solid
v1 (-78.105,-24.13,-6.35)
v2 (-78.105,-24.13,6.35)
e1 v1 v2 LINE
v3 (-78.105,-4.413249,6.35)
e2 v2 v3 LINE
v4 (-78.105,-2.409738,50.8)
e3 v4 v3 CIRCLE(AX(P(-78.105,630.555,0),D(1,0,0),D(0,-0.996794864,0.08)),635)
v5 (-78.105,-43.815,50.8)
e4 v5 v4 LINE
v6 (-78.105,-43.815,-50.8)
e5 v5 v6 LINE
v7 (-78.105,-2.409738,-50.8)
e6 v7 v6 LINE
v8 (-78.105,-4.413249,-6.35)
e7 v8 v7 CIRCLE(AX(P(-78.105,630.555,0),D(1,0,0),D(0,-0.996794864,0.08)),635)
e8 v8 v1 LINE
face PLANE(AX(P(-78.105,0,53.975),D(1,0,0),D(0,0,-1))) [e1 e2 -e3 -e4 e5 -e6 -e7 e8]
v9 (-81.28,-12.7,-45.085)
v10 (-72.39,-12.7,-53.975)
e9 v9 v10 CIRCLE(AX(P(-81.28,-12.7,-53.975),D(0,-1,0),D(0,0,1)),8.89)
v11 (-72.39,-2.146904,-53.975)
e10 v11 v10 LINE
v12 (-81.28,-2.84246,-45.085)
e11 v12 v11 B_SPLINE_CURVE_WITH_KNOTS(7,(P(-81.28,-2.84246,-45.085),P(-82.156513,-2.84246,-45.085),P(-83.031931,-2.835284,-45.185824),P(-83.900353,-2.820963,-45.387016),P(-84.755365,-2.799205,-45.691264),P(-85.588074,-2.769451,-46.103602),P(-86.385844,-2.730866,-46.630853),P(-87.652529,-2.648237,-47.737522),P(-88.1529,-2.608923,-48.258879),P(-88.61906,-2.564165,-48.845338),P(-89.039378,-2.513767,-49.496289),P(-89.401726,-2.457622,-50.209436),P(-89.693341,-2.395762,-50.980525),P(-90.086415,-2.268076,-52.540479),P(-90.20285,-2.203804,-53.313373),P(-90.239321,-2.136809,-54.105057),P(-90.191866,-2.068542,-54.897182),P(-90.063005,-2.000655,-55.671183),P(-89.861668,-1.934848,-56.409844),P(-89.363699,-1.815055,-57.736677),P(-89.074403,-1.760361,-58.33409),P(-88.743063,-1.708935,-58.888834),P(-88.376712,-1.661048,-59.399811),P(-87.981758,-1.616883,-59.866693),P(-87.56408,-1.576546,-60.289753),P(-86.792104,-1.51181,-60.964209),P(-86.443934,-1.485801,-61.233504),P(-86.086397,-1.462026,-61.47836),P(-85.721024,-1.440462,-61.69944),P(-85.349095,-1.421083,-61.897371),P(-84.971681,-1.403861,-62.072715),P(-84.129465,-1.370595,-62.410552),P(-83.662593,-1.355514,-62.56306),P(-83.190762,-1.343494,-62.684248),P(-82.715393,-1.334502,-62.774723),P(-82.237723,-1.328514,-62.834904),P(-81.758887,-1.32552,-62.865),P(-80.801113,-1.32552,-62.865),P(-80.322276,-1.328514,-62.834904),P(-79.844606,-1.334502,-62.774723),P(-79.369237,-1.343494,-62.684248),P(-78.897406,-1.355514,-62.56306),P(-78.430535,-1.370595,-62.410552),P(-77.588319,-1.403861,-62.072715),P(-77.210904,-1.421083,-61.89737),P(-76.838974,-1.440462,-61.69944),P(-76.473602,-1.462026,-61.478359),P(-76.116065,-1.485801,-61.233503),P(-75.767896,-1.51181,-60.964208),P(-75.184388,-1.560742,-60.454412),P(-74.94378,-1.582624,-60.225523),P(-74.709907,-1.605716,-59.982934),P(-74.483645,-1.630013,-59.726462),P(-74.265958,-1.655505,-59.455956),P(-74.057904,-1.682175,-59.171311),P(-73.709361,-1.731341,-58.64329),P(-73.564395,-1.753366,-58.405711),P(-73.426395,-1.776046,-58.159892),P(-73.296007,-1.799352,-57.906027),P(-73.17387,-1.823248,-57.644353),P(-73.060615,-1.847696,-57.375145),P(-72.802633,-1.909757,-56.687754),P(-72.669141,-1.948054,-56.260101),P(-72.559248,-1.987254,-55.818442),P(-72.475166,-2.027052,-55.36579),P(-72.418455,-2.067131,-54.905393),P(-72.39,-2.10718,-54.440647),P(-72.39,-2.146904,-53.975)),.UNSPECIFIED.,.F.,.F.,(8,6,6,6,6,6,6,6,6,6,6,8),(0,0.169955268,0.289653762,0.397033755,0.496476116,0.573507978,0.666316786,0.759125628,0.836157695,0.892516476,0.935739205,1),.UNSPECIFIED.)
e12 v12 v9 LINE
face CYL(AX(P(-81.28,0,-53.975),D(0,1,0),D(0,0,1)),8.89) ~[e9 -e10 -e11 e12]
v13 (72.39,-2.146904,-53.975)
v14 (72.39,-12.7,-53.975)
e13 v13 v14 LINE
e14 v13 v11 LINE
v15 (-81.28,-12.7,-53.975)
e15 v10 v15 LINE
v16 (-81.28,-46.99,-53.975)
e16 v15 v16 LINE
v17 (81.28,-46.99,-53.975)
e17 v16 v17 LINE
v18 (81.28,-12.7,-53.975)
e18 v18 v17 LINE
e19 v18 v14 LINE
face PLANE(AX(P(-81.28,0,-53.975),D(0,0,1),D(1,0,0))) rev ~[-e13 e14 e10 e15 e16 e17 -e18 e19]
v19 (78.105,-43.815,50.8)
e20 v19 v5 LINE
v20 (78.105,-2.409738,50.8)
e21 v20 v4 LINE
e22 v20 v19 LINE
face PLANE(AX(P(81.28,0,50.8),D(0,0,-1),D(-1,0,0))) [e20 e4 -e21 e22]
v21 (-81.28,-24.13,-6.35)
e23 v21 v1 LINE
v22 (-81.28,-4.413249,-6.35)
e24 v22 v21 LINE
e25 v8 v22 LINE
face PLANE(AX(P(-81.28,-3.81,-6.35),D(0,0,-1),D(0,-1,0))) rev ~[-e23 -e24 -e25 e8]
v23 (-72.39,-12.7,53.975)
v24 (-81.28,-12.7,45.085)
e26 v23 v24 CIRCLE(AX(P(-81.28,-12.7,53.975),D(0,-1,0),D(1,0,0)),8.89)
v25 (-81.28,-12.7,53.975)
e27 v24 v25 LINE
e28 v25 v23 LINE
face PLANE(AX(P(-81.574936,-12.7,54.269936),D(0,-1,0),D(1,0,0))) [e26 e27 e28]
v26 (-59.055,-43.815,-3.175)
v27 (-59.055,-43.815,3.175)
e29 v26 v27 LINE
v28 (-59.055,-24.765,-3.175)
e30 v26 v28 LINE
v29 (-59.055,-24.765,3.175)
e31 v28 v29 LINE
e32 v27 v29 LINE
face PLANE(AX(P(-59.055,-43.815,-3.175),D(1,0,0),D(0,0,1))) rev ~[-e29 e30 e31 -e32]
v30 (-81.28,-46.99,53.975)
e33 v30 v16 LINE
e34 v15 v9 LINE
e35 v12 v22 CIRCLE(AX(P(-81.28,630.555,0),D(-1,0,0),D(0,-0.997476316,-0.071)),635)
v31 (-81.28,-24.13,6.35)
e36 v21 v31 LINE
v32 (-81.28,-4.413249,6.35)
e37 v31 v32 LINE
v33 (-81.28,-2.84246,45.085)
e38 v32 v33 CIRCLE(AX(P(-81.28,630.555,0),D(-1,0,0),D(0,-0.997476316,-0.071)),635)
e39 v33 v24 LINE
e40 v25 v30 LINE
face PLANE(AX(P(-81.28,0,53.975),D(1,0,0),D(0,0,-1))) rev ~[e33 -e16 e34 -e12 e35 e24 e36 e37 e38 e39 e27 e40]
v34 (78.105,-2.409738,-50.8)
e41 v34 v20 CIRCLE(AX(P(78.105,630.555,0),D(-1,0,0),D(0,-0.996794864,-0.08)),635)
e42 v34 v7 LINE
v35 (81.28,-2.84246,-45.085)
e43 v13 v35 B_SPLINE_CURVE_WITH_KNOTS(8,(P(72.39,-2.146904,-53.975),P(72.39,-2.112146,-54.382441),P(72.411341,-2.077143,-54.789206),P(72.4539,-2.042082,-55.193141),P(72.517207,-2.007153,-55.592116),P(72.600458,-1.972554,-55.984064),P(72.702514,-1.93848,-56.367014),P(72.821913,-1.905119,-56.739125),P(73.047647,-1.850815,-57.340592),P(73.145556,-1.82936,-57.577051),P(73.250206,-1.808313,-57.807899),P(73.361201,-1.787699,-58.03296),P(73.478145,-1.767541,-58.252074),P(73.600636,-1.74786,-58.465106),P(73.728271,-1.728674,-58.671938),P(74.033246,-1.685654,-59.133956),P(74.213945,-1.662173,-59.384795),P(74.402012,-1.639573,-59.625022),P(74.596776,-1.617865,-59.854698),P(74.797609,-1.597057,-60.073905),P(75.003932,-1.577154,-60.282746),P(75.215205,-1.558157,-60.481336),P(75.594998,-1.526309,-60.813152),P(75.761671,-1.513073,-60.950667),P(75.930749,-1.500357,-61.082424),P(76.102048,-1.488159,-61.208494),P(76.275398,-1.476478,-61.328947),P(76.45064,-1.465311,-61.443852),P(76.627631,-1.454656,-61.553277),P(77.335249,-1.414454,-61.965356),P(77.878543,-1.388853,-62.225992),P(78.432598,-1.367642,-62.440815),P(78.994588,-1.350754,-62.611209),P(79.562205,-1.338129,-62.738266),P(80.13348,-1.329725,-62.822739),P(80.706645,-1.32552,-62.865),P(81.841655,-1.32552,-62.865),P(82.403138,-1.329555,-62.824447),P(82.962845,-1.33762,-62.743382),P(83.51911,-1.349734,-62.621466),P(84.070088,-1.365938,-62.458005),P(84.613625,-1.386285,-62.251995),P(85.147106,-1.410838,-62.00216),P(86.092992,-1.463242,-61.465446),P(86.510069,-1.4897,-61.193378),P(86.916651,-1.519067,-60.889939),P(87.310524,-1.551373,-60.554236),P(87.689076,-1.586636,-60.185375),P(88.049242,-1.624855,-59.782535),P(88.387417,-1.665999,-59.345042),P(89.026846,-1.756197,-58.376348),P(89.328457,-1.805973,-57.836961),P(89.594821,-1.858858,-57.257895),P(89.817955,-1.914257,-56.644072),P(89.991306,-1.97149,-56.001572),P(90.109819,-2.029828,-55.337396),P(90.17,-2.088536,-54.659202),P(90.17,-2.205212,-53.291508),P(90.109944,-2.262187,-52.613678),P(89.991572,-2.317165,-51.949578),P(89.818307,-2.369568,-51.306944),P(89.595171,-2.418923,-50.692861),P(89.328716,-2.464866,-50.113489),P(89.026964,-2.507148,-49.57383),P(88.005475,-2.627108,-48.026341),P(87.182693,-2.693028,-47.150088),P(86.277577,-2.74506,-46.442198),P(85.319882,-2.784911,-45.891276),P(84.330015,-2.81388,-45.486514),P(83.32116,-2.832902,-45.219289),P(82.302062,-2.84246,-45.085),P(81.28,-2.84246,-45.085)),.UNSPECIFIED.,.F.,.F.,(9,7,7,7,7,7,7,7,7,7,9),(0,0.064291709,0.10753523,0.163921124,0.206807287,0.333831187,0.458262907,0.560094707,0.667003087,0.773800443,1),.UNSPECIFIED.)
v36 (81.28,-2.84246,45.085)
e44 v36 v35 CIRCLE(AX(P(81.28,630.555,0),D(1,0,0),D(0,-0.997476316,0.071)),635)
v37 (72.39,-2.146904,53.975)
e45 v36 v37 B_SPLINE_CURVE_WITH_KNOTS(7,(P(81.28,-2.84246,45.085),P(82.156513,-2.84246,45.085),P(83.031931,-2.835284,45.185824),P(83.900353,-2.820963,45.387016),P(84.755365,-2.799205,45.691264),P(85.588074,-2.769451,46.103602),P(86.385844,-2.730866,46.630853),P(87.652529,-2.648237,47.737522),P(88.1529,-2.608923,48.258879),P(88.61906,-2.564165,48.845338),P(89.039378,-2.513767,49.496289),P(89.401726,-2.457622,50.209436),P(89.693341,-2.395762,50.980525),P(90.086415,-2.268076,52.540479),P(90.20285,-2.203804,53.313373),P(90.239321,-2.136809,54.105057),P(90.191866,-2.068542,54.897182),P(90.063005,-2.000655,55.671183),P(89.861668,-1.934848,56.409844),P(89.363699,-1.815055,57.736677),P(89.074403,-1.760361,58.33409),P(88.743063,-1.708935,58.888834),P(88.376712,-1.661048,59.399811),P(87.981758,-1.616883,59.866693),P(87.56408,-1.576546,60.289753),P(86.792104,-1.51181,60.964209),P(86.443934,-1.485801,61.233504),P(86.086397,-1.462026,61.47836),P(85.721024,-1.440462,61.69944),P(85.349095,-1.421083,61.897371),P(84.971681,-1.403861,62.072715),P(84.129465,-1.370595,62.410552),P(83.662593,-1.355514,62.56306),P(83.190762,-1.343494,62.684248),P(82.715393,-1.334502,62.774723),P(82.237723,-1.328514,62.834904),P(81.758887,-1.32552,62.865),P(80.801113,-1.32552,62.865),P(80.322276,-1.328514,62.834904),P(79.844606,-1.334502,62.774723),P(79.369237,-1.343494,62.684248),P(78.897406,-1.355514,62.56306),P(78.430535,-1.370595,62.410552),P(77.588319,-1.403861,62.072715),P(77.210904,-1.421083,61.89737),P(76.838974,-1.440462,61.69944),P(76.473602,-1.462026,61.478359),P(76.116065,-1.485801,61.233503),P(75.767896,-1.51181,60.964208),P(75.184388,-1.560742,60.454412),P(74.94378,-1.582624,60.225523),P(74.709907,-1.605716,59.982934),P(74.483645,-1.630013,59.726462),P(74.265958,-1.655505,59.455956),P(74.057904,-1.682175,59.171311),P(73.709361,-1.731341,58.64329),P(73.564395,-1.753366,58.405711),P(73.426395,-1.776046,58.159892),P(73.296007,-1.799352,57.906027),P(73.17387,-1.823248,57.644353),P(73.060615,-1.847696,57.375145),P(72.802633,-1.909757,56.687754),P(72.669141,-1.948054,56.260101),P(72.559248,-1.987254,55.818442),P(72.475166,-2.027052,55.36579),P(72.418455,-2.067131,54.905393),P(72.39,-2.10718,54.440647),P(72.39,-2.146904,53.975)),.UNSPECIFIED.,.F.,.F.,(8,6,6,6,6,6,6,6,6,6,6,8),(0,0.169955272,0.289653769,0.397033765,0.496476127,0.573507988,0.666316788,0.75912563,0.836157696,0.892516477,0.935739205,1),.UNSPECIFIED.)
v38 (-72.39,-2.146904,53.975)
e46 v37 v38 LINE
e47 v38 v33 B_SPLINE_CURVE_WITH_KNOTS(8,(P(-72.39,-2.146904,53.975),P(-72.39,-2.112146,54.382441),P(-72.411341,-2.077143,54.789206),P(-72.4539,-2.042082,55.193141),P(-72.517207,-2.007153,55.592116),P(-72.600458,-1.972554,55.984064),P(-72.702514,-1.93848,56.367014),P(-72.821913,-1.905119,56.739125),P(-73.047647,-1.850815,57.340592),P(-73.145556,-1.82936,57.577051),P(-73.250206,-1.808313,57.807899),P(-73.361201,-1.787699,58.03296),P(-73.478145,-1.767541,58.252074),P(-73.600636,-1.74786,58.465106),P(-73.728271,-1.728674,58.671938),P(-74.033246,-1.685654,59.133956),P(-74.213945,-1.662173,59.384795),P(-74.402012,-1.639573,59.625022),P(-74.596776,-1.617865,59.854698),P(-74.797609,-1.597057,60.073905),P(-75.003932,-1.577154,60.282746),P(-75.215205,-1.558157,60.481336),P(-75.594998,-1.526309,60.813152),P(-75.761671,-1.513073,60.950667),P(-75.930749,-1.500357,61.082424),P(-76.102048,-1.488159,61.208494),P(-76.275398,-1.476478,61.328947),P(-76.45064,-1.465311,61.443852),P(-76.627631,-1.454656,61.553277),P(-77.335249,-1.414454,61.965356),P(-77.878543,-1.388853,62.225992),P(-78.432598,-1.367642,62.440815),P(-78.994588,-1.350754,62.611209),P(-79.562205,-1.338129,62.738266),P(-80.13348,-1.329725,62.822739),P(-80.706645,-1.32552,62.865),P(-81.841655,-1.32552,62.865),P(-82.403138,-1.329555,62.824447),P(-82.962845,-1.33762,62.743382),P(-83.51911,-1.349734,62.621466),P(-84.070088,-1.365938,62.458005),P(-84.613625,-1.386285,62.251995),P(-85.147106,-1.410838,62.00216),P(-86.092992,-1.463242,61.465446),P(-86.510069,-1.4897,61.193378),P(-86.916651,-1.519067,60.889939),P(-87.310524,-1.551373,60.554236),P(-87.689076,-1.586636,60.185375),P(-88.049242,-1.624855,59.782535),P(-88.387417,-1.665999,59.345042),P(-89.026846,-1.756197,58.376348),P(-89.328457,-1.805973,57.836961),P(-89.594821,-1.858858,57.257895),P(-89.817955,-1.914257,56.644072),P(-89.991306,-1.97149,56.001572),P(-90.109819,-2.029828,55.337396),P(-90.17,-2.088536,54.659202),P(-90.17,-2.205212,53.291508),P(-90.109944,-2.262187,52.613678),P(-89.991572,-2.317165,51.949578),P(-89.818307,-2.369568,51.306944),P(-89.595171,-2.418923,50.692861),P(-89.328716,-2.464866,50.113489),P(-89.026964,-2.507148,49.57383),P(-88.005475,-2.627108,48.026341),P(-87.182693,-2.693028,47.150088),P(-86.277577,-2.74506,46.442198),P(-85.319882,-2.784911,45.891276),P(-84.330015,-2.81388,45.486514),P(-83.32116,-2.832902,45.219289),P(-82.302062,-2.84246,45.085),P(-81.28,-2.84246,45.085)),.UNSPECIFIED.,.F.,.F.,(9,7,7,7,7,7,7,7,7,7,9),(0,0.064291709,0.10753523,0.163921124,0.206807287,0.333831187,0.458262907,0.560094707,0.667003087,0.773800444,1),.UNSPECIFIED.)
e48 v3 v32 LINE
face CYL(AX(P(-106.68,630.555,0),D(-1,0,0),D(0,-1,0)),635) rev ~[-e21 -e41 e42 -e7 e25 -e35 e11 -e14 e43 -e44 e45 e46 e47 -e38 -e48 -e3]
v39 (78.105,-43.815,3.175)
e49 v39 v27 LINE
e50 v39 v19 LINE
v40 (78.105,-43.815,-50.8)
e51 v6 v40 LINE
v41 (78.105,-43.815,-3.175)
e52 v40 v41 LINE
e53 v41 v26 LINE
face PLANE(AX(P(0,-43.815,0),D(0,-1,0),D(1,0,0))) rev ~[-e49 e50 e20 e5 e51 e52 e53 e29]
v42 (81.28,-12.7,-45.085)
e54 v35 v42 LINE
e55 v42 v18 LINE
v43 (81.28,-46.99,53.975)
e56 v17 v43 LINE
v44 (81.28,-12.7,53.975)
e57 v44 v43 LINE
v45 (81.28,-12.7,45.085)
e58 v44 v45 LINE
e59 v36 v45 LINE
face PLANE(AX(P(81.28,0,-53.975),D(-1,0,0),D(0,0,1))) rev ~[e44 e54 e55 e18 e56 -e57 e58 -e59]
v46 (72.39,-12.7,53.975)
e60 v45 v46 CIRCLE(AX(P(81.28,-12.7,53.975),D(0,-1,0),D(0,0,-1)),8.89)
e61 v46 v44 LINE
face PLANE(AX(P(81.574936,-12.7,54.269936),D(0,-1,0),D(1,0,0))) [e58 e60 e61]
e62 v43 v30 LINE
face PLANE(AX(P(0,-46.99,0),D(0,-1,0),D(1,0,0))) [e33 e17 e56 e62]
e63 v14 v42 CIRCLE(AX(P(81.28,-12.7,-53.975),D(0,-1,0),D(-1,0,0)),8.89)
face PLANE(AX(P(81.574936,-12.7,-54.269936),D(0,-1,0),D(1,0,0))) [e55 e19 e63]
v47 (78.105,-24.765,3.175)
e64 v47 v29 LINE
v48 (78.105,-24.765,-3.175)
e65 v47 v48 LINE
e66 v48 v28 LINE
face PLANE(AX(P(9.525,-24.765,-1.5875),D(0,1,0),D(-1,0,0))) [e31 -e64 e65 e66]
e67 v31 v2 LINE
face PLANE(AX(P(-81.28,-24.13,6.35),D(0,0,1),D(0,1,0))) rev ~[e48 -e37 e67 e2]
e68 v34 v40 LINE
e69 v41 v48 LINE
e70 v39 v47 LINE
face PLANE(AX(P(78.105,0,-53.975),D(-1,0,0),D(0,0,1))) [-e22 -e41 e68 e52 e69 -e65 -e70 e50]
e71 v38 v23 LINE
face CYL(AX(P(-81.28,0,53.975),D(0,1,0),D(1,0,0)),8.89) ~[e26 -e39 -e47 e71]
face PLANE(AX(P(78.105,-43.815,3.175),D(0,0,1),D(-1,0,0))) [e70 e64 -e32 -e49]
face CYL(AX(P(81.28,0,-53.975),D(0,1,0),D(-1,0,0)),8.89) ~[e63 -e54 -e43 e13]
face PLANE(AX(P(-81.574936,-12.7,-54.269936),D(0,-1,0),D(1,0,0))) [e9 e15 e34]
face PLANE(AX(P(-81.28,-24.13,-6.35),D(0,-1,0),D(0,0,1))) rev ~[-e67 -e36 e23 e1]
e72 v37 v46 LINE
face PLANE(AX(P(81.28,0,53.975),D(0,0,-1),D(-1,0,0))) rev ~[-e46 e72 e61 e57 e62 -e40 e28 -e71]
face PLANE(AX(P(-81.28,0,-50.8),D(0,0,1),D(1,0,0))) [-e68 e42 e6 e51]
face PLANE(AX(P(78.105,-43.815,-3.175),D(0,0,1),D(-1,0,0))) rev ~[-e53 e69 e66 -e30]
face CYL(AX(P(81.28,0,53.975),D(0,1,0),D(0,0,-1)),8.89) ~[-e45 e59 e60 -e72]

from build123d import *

# Parameters (mm, degrees)
F1_DEPTH  = 46.99
F2_T      = -3.175
F5_DEPTH  = 12.7
F6_R      = 635
F7_DEPTH  = 279.4
F8_DEPTH  = 3.175
F9_W      = 137.16
F9_H      = 3.175
F10_DEPTH = 19.05


# Not quite as in the source:
# - a feature names something its author has since deleted; it is built from what else it names


with BuildPart() as f1:
    # F0 (on Front) → F1 (new body)
    with BuildSketch(Plane.XZ):
        Polygon((-72.39, 53.975), (-81.28, 53.975), (-81.28, 45.085), (-81.28, -45.085), (-81.28, -53.975), (-72.39, -53.975), (72.39, -53.975), (81.28, -53.975), (81.28, -45.085), (81.28, 45.085), (81.28, 53.975), (72.39, 53.975), align=None)
    extrude(amount=F1_DEPTH)

    # F2
    f2_openings = [f1.faces().sort_by_distance(p)[0] for p in [
        (0, 0, 0),
    ]]
    offset(amount=F2_T, openings=f2_openings)

    # F0 (on Front) → F5 (join)
    with BuildSketch(Plane.XZ):
        with BuildLine():
            Line((-81.28, 45.085), (-81.28, 53.975))
            Line((-81.28, 53.975), (-72.39, 53.975))
            ThreePointArc((-72.39, 53.975), (-87.5661792847, 60.2611792847), (-81.28, 45.085))
        make_face()
        with BuildLine():
            Line((-81.28, -53.975), (-81.28, -45.085))
            ThreePointArc((-81.28, -45.085), (-87.5661792847, -60.2611792847), (-72.39, -53.975))
            Line((-72.39, -53.975), (-81.28, -53.975))
        make_face()
        with BuildLine():
            ThreePointArc((81.28, 45.085), (87.5661792847, 60.2611792847), (72.39, 53.975))
            Line((72.39, 53.975), (81.28, 53.975))
            Line((81.28, 53.975), (81.28, 45.085))
        make_face()
        with BuildLine():
            ThreePointArc((72.39, -53.975), (87.5661792847, -60.2611792847), (81.28, -45.085))
            Line((81.28, -45.085), (81.28, -53.975))
            Line((81.28, -53.975), (72.39, -53.975))
        make_face()
    extrude(amount=F5_DEPTH)

    # F6 (on offset) → F7 (cut)
    with BuildSketch(Plane(origin=(-106.68, 0, 0), x_dir=(0, -1, 0), z_dir=(-1, 0, 0))):
        with Locations((-630.555, 0)):
            Circle(F6_R)
    extrude(amount=-F7_DEPTH, mode=Mode.SUBTRACT)

    # F4 (on face) → F8 (cut)
    with BuildSketch(Plane(origin=(-81.28, 0, 0), x_dir=(0, -1, 0), z_dir=(-1, 0, 0))):
        Polygon((24.13, 0), (13.97, 0), (3.81, 0), (3.81, -6.35), (24.13, -6.35), align=None)
        Polygon((3.81, 0), (13.97, 0), (24.13, 0), (24.13, 6.35), (3.81, 6.35), align=None)
    extrude(amount=-F8_DEPTH, mode=Mode.SUBTRACT)

    # F9 (on face) → F10 (join)
    with BuildSketch(Plane(origin=(0, -43.815, 0), x_dir=(-1, 0, 0), z_dir=(0, 1, 0))):
        with Locations((-9.525, -1.5875)):
            Rectangle(F9_W, F9_H)
        with Locations((-9.525, 1.5875)):
            Rectangle(F9_W, F9_H)
    extrude(amount=F10_DEPTH)


solid = f1.part
